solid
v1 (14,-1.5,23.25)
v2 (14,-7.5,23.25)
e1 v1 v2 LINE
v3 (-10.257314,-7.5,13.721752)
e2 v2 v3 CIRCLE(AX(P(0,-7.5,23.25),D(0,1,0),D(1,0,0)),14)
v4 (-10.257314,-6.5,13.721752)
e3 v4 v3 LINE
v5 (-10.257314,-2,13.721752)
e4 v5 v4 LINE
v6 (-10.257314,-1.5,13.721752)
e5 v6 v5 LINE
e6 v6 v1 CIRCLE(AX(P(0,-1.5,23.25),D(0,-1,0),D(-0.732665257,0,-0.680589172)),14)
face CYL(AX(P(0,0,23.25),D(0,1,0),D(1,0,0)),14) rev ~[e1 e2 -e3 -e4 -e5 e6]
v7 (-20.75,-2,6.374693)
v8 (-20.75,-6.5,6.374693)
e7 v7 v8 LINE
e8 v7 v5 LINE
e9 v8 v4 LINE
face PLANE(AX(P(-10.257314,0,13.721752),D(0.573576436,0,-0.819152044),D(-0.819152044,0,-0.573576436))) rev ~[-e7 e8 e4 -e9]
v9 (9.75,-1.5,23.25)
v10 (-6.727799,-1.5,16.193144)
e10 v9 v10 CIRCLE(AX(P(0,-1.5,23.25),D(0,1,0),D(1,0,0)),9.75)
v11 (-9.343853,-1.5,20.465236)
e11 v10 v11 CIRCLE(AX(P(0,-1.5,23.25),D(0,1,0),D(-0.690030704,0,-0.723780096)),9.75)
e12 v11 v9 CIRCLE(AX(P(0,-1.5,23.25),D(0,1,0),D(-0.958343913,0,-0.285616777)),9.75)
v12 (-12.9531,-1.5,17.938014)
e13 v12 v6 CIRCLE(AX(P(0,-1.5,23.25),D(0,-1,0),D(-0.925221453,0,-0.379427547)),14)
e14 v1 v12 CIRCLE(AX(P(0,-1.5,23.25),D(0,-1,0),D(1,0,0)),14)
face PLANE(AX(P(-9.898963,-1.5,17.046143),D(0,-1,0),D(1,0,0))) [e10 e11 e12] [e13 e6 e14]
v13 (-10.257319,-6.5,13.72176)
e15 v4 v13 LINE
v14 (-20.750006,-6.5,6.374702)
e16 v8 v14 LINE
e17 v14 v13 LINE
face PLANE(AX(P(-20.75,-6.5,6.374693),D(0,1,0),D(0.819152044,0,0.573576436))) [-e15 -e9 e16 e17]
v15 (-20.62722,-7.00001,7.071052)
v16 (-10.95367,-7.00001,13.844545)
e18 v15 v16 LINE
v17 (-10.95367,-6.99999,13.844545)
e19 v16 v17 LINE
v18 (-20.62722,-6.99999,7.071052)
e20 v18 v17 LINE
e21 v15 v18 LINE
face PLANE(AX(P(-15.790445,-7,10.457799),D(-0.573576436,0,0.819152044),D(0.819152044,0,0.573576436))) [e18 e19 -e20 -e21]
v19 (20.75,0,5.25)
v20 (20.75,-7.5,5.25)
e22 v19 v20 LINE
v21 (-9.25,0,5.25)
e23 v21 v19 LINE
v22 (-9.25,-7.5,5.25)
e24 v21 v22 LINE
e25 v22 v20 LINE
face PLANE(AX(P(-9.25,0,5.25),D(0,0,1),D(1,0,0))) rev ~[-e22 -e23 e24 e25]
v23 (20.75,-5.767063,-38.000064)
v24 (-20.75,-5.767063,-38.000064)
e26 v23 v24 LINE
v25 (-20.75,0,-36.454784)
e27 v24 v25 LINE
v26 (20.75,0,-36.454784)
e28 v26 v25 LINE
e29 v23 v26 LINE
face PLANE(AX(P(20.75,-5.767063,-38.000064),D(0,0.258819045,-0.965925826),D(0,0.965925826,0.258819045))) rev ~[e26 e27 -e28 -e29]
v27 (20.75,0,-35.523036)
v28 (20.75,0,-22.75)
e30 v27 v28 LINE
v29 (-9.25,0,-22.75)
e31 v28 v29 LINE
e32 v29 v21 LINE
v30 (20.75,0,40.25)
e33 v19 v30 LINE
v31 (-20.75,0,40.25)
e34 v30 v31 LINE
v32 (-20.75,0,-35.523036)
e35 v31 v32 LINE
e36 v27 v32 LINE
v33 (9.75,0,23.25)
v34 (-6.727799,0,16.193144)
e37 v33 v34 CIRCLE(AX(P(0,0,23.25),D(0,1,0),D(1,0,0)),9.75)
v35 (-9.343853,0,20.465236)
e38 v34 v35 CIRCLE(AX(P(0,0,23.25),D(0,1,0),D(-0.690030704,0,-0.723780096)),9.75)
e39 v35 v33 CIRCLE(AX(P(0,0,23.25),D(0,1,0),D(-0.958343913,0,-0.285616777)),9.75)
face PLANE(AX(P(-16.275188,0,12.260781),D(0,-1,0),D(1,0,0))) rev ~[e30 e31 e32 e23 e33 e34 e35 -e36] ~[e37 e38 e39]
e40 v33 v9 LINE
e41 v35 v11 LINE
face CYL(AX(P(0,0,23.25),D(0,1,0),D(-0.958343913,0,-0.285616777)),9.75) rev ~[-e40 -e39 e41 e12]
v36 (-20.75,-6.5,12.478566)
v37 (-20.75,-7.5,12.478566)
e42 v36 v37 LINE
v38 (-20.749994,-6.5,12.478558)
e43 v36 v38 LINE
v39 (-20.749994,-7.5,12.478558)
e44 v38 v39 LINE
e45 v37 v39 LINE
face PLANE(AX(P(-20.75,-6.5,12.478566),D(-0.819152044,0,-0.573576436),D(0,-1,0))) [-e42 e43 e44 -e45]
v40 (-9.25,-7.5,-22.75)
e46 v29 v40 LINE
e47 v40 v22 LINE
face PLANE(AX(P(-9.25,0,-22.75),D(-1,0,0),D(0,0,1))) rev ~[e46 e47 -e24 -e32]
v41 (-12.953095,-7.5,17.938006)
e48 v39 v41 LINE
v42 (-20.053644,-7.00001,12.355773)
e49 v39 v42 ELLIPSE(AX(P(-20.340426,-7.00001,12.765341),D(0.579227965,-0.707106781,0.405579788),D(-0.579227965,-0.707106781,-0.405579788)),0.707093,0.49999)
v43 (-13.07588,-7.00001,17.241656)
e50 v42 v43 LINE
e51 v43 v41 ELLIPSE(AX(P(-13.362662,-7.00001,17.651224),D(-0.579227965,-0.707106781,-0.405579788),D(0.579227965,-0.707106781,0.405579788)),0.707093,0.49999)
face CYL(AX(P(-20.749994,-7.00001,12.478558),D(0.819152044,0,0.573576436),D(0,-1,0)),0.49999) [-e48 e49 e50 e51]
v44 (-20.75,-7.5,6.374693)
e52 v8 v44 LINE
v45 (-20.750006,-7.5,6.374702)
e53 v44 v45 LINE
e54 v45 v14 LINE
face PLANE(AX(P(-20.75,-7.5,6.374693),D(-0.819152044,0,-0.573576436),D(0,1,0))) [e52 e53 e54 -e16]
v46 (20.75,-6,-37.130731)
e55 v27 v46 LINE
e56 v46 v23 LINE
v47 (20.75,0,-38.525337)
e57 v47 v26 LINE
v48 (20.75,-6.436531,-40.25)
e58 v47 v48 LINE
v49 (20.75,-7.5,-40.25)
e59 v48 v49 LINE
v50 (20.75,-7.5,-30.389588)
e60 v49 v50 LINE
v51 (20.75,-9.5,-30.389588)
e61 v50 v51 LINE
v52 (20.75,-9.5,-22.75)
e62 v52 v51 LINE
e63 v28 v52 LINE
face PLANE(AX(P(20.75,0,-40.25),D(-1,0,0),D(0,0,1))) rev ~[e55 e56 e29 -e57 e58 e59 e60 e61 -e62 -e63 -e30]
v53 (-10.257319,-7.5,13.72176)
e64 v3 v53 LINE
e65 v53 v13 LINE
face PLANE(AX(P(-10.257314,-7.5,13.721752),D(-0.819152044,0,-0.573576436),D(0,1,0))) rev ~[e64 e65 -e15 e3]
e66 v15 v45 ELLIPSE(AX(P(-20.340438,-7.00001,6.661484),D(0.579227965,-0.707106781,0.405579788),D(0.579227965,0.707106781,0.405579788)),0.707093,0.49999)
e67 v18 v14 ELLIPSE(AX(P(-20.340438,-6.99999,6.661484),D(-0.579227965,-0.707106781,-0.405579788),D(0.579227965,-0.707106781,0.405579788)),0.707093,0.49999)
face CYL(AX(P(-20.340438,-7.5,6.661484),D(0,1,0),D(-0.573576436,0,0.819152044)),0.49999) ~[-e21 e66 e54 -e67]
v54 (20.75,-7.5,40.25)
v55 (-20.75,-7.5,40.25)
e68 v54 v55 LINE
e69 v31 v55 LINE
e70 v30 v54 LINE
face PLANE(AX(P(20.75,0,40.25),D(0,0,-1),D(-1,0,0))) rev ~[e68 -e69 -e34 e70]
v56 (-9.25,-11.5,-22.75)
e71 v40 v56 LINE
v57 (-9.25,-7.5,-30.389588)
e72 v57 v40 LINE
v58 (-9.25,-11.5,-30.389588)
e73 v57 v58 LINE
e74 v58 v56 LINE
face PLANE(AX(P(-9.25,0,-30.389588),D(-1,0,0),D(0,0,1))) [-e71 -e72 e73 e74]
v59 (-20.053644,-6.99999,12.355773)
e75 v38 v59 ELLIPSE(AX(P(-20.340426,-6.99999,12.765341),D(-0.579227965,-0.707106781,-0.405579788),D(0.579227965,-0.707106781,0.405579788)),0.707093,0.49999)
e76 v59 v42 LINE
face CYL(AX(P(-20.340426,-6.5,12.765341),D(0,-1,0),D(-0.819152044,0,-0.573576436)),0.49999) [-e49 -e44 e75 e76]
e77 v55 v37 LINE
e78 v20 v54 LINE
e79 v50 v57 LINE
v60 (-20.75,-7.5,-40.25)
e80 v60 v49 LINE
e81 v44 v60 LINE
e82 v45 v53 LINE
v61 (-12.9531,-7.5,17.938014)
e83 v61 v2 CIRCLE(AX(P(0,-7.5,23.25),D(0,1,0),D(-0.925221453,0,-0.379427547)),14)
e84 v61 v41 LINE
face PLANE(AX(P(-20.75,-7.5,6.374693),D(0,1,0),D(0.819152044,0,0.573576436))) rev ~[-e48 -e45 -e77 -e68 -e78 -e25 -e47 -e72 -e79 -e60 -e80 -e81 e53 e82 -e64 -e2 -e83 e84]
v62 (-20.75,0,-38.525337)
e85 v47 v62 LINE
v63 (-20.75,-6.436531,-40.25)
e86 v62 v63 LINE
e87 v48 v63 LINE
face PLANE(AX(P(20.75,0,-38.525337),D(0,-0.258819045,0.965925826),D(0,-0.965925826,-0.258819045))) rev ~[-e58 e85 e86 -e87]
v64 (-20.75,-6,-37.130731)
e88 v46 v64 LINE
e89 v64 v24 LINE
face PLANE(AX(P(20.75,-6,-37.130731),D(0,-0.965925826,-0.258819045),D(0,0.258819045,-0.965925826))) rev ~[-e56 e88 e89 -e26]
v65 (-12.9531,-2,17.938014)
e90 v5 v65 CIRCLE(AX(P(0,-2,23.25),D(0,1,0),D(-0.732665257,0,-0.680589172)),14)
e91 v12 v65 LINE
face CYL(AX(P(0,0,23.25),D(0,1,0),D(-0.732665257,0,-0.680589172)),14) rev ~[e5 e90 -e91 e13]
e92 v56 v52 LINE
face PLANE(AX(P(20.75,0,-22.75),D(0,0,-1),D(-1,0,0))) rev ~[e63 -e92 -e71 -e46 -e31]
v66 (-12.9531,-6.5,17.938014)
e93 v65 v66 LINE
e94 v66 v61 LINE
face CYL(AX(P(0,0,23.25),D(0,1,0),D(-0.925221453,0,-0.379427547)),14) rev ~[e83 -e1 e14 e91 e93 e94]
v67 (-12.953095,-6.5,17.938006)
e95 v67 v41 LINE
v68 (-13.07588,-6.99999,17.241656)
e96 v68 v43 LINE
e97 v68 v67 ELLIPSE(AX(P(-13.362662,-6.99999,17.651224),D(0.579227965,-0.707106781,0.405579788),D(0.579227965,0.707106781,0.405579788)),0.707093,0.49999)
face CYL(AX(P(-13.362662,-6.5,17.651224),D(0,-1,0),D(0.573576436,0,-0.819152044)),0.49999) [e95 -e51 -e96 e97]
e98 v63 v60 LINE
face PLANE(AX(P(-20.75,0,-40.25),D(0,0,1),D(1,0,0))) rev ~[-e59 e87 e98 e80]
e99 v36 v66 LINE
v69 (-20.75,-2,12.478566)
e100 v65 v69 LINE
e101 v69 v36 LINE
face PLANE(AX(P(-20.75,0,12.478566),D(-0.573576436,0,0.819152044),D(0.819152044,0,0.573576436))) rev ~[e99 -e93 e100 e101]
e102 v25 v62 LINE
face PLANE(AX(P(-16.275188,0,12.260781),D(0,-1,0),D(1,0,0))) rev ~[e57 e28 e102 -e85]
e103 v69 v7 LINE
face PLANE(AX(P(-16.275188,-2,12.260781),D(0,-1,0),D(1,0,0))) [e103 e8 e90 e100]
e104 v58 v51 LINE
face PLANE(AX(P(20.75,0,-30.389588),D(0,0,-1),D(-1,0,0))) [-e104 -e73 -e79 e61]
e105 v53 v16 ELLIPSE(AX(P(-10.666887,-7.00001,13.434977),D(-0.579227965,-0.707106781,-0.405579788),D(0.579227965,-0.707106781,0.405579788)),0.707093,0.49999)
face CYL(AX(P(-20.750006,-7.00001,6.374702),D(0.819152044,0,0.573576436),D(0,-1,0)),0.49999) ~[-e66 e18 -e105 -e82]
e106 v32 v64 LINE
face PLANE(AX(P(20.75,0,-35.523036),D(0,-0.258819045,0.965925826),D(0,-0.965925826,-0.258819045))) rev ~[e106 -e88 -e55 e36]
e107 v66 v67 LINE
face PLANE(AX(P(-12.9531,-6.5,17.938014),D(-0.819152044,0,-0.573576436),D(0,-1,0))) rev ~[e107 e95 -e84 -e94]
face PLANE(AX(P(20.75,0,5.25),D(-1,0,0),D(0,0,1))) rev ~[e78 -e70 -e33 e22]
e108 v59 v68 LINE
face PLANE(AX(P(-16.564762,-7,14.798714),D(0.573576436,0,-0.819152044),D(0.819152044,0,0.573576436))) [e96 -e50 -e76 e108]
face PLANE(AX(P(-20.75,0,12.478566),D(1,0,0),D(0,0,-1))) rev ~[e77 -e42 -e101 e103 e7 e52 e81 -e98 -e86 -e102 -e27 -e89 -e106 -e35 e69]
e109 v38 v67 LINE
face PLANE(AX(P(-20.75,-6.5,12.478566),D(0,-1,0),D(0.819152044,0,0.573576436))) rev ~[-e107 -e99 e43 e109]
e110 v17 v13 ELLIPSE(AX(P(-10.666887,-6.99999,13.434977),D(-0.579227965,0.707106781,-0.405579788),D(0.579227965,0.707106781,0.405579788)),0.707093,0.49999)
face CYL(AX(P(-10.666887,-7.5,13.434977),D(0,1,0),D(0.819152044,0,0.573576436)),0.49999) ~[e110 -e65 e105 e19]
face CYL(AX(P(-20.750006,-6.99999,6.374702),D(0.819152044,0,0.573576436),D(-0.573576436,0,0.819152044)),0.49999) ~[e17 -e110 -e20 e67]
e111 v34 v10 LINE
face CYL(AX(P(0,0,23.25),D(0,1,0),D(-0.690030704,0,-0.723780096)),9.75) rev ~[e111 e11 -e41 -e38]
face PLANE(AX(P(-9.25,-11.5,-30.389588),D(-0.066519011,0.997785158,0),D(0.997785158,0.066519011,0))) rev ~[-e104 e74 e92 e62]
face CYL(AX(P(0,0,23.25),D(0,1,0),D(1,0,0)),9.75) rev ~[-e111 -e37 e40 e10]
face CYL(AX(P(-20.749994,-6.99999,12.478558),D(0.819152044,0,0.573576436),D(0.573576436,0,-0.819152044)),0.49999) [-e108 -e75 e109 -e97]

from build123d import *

# Parameters (mm, degrees)
F1_DEPTH  = 7.5
F2_DEPTH  = 1.5
F3_DEPTH  = 2
F5_DEPTH  = 45
F6_DEPTH  = 45
F7_W      = 9.5182569801
F7_H      = 1
F8_DEPTH  = 0.5
F9_W      = 12.8092049275
F9_H      = 1
F10_DEPTH = 0.5
F11_R     = 0.49999
F12_R     = 0.49999
F13_W     = 30
F13_H     = 7.6395883262
F14_DEPTH = 11.5
F16_DEPTH = 12.5


# Not quite as in the source:
# - a fillet or chamfer is up to 0.001 mm smaller than in the source, because OpenCascade refuses the exact size


with BuildPart() as f1:
    # F0 (on Front) → F1 (new body)
    with BuildSketch(Plane.XZ):
        with BuildLine():
            Line((-20.75, -40.25), (20.75, -40.25))
            Line((20.75, -40.25), (20.75, -22.75))
            Line((20.75, -22.75), (-9.25, -22.75))
            Line((-9.25, -22.75), (-9.25, 5.25))
            Line((-9.25, 5.25), (20.75, 5.25))
            Line((20.75, 5.25), (20.75, 40.25))
            Line((20.75, 40.25), (-20.75, 40.25))
            Line((-20.75, 40.25), (-20.75, 12.4785664195))
            Line((-20.75, 12.4785664195), (-12.9531003366, 17.9380143384))
            ThreePointArc((-12.9531003366, 17.9380143384), (-2.707082866, 36.9857818255), (14, 23.25))
            ThreePointArc((14, 23.25), (5.1184768061, 10.2192212364), (-10.2573135979, 13.7217515905))
            Line((-10.2573135979, 13.7217515905), (-20.75, 6.3746934757))
            Line((-20.75, 6.3746934757), (-20.75, -40.25))
        make_face()
    extrude(amount=F1_DEPTH)

    # F0 (on Front) → F2 (join)
    with BuildSketch(Plane.XZ):
        with BuildLine():
            ThreePointArc((-12.9531003366, 17.9380143384), (-11.7951280893, 15.7084515279), (-10.2573135979, 13.7217515905))
            Line((-10.2573135979, 13.7217515905), (-6.7277993643, 16.1931440631))
            ThreePointArc((-6.7277993643, 16.1931440631), (-8.3148780488, 18.158310395), (-9.3438531565, 20.4652364212))
            Line((-9.3438531565, 20.4652364212), (-12.9531003366, 17.9380143384))
        make_face()
        with BuildLine():
            Line((-6.7277993643, 16.1931440631), (-10.2573135979, 13.7217515905))
            ThreePointArc((-10.2573135979, 13.7217515905), (5.1184768061, 10.2192212364), (14, 23.25))
            ThreePointArc((14, 23.25), (-2.707082866, 36.9857818255), (-12.9531003366, 17.9380143384))
            Line((-12.9531003366, 17.9380143384), (-9.3438531565, 20.4652364212))
            ThreePointArc((-9.3438531565, 20.4652364212), (-1.4071125975, 32.8979290077), (9.75, 23.25))
            ThreePointArc((9.75, 23.25), (3.8383887374, 14.2873401325), (-6.7277993643, 16.1931440631))
        make_face()
    extrude(amount=F2_DEPTH)

    # F0 (on Front) → F3 (join)
    with BuildSketch(Plane.XZ):
        with BuildLine():
            Line((-20.75, 12.4785664195), (-20.75, 6.3746934757))
            Line((-20.75, 6.3746934757), (-10.2573135979, 13.7217515905))
            ThreePointArc((-10.2573135979, 13.7217515905), (-11.7951280893, 15.7084515279), (-12.9531003366, 17.9380143384))
            Line((-12.9531003366, 17.9380143384), (-20.75, 12.4785664195))
        make_face()
    extrude(amount=F3_DEPTH)

    # F4 (on face) → F5 (cut)
    with BuildSketch(Plane.YZ.offset(20.75)):
        Polygon((-6.4365309663, -40.25), (0, -40.25), (0, -38.5253367255), align=None)
    extrude(amount=-F5_DEPTH, mode=Mode.SUBTRACT)

    # F4 (on face) → F6 (cut)
    with BuildSketch(Plane.YZ.offset(20.75)):
        Polygon((-5.7670628594, -38.0000642006), (0, -36.4547843647), (0, -35.5230358023), (-6, -37.1307309569), align=None)
    extrude(amount=-F6_DEPTH, mode=Mode.SUBTRACT)

    # F7 (on face) → F8 (join)
    with BuildSketch(Plane(origin=(-12.6895494042, 0, 18.122554688), x_dir=(0.8191520443, 0, 0.5735764364), z_dir=(0.5735764364, 0, -0.8191520443))):
        with Locations((-5.0808647713, 7)):
            Rectangle(F7_W, F7_H)
    extrude(amount=F8_DEPTH)

    # F9 (on face) → F10 (join)
    with BuildSketch(Plane(origin=(-9.8216672224, 0, 14.0267944666), x_dir=(0.8191520443, 0, 0.5735764364), z_dir=(-0.5735764364, 0, 0.8191520443))):
        with Locations((-6.9364284886, -7)):
            Rectangle(F9_W, F9_H)
    extrude(amount=F10_DEPTH)

    # F11 (radius 0.5 in the source; OpenCascade refuses exactly that, so slightly less here)
    f11_edges = [f1.edges().sort_by_distance(p)[0] for p in [
        (-20.463212, -7, 12.06899),
        (-16.564762, -6.5, 14.798714),
        (-12.666312, -7, 17.528438),
        (-16.564762, -7.5, 14.798714),
    ]]
    fillet(f11_edges, radius=F11_R)

    # F12 (radius 0.5 in the source; OpenCascade refuses exactly that, so slightly less here)
    f12_edges = [f1.edges().sort_by_distance(p)[0] for p in [
        (-15.790445, -6.5, 10.457799),
        (-21.036788, -7, 6.784269),
        (-15.790445, -7.5, 10.457799),
        (-10.544102, -7, 14.131328),
    ]]
    fillet(f12_edges, radius=F12_R)

    # F13 (on face) → F14 (join)
    with BuildSketch(Plane(origin=(0, 0, 0), x_dir=(-1, 0, 0), z_dir=(0, 1, 0))):
        with Locations((-5.75, -26.5697941631)):
            Rectangle(F13_W, F13_H)
    extrude(amount=-F14_DEPTH)

    # F15 (on face) → F16 (cut, symmetric)
    with BuildSketch(Plane(origin=(0, 0, -30.3895883262), x_dir=(1, 0, 0), z_dir=(0, 0, -1))):
        Polygon((-9.25, 11.5), (20.75, 9.5), (20.75, 11.5), align=None)
    extrude(amount=F16_DEPTH, both=True, mode=Mode.SUBTRACT)


solid = f1.part
